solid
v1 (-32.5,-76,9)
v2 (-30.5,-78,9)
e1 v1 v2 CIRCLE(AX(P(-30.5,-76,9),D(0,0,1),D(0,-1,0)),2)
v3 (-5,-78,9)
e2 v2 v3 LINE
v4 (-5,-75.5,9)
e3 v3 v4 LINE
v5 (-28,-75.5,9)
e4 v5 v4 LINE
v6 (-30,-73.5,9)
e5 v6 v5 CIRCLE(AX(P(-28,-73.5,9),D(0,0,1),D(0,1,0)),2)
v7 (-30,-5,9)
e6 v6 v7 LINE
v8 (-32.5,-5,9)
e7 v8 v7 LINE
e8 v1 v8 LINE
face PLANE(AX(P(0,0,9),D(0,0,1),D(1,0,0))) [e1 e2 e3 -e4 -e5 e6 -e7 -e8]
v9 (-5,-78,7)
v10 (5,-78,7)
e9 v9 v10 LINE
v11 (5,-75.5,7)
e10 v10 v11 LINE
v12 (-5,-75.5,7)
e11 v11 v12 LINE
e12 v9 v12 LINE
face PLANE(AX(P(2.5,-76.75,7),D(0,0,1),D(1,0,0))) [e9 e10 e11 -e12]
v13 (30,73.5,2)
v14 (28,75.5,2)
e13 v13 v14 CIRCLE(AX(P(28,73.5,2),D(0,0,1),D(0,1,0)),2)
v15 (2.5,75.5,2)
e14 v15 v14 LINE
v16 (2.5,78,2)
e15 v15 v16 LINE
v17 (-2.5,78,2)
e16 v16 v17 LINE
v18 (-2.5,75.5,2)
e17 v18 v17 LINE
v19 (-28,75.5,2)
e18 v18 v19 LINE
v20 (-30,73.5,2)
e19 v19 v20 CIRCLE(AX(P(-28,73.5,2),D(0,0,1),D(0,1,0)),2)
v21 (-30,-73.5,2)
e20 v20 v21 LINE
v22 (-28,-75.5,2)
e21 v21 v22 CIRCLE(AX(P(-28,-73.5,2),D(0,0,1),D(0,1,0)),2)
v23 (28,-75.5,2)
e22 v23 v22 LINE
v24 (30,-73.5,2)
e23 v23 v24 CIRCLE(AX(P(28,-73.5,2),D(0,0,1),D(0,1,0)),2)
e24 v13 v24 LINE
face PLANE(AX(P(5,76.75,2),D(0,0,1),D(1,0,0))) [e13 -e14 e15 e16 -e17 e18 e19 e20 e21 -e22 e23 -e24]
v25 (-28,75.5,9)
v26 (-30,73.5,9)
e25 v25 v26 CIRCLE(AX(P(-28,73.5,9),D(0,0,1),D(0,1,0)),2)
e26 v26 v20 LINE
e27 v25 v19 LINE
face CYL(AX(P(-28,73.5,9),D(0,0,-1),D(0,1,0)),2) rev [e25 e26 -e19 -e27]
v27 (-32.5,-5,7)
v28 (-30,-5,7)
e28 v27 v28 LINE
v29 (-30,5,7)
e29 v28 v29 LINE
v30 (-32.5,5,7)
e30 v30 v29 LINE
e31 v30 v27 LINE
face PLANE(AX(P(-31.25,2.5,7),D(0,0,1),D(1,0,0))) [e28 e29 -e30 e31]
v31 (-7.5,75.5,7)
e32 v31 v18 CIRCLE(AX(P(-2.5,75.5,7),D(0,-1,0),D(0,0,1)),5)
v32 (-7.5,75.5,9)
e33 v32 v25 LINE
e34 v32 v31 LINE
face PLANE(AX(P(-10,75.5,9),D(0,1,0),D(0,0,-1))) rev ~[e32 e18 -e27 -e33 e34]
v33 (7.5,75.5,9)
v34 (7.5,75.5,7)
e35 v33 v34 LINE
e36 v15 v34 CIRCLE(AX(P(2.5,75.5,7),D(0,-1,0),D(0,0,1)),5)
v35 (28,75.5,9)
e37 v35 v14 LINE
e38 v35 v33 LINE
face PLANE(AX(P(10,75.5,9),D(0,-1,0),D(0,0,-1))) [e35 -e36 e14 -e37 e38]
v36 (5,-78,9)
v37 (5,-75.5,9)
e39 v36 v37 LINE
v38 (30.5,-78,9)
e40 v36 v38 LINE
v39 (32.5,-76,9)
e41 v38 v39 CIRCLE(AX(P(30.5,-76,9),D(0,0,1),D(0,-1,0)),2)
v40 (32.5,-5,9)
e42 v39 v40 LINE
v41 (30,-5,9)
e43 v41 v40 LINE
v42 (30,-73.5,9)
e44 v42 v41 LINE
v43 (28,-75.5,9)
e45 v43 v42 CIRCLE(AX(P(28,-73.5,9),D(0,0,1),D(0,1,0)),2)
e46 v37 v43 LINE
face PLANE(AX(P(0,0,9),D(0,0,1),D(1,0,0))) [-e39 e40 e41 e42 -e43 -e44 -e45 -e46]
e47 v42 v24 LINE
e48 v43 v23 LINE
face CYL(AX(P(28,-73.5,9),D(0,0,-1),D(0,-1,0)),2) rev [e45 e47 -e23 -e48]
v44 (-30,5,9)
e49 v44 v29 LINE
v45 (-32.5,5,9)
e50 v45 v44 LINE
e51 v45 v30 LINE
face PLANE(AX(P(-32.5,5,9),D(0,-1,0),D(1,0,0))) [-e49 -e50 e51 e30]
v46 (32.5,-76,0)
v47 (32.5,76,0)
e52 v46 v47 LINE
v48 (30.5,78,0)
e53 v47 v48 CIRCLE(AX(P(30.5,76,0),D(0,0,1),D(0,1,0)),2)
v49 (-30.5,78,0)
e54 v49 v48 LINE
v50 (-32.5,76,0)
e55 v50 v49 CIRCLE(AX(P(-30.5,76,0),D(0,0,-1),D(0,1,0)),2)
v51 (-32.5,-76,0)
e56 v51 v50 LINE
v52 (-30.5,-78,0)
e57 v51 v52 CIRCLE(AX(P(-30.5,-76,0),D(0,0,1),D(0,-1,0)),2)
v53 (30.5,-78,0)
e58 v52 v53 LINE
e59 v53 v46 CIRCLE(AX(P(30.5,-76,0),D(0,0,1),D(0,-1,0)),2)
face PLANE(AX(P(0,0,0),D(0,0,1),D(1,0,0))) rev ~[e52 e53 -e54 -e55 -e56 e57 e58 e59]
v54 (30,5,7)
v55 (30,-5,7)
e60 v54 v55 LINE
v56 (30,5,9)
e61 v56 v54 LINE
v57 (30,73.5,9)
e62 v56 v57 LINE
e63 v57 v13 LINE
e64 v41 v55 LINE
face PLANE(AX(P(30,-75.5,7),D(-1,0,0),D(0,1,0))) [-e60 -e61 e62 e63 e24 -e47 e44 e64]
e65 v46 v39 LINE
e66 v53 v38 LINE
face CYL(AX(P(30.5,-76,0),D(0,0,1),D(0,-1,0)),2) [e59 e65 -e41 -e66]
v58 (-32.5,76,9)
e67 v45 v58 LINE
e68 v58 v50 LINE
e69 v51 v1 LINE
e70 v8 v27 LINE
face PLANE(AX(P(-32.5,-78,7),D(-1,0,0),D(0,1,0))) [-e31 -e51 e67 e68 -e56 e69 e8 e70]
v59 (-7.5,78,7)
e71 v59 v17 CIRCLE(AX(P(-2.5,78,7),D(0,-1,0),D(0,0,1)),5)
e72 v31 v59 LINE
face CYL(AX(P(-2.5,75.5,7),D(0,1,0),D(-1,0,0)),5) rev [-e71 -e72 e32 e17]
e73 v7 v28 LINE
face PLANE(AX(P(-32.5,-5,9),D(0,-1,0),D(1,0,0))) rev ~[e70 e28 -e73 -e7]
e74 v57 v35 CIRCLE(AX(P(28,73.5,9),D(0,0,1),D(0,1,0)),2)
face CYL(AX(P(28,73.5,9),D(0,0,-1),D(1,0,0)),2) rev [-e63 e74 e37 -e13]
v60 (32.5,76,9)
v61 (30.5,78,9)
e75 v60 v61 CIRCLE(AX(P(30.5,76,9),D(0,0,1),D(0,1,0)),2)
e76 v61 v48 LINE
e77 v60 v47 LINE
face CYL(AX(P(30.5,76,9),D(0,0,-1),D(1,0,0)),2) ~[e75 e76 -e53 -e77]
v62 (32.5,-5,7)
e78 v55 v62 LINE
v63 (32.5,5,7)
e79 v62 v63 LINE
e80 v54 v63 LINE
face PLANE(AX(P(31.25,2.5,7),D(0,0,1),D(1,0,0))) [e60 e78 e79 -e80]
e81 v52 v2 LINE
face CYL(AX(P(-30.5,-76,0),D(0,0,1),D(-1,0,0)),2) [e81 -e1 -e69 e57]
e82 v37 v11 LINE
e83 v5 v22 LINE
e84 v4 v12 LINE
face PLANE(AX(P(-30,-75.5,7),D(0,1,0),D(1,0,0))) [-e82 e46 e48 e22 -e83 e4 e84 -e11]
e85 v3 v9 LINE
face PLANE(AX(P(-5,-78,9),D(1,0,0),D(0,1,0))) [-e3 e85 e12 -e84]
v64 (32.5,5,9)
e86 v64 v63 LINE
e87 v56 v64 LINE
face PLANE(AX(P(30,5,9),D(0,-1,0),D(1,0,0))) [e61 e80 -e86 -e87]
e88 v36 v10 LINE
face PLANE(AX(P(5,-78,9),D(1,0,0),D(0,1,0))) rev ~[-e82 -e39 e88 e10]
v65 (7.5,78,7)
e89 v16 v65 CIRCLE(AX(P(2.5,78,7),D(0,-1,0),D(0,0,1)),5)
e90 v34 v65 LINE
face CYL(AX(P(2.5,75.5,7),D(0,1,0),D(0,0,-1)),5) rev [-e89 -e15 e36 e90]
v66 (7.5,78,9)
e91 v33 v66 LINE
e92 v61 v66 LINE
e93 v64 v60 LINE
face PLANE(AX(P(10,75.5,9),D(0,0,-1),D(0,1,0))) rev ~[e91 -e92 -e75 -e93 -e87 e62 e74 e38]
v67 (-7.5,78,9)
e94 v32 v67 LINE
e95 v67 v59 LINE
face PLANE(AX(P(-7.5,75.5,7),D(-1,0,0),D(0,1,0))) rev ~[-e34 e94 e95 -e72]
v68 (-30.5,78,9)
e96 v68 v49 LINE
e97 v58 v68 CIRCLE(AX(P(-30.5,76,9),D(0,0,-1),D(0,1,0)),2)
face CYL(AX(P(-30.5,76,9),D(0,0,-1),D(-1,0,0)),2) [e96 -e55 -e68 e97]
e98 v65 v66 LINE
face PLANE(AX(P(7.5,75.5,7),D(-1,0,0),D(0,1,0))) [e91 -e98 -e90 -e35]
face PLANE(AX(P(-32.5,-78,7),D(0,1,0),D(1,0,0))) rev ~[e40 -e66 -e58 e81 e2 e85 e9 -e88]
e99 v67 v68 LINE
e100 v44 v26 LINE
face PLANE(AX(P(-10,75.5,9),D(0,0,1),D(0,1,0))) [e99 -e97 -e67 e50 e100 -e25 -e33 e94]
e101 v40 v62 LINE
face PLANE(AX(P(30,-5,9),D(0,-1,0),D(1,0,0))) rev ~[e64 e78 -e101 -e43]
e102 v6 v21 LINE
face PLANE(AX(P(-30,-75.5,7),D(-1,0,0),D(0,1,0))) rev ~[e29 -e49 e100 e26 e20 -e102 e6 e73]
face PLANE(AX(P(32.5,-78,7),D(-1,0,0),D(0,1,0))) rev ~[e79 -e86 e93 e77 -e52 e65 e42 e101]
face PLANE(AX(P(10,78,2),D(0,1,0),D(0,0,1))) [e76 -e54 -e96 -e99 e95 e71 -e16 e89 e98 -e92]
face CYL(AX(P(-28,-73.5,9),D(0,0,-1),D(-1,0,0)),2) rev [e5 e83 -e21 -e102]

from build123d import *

# Parameters (mm, degrees)
F0_W      = 65
F0_H      = 156
F0_W_2    = 60
F0_H_2    = 151
F1_DEPTH  = 2
F2_DEPTH  = 7
F3_W      = 10
F3_H      = 2.5
F4_DEPTH  = 5
F5_DEPTH  = 2
F6_R      = 2
F7_R      = 2
F8_W      = 5
F8_H      = 2.5
F8_W_2    = 2.5
F8_H_2    = 5
F9_DEPTH  = 2
F10_DEPTH = 2.5
F11_DEPTH = 2.5
F12_R     = 5


with BuildPart() as f1:
    # F0 (on Top) → F1 (new body)
    with BuildSketch(Plane.XY):
        Rectangle(F0_W, F0_H)
        Rectangle(F0_W_2, F0_H_2, mode=Mode.SUBTRACT)
        Rectangle(F0_W_2, F0_H_2)
    extrude(amount=F1_DEPTH)

    # F0 (on Top) → F2 (join)
    with BuildSketch(Plane.XY):
        Rectangle(F0_W, F0_H)
        Rectangle(F0_W_2, F0_H_2, mode=Mode.SUBTRACT)
    extrude(amount=F2_DEPTH)

    # F3 (on face) → F4 (cut, through all)
    with BuildSketch(Plane.XY.offset(7)):
        with Locations((5, 76.75)):
            Rectangle(F3_W, F3_H)
        with Locations((-5, 76.75)):
            Rectangle(F3_W, F3_H)
    extrude(amount=-F4_DEPTH, mode=Mode.SUBTRACT)

    # F5 (add): a face of the model
    f5_faces = [f1.faces().sort_by_distance(p)[0] for p in [
        (0, -76.31, 7),
    ]]
    extrude(f5_faces, amount=F5_DEPTH)

    # F6
    f6_edges = [f1.edges().sort_by_distance(p)[0] for p in [
        (-32.5, 78, 4.5),
        (32.5, 78, 4.5),
        (32.5, -78, 4.5),
        (-32.5, -78, 4.5),
    ]]
    fillet(f6_edges, radius=F6_R)

    # F7
    f7_edges = [f1.edges().sort_by_distance(p)[0] for p in [
        (-30, 75.5, 5.5),
        (30, 75.5, 5.5),
        (30, -75.5, 5.5),
        (-30, -75.5, 5.5),
    ]]
    fillet(f7_edges, radius=F7_R)

    # F8 (on face) → F9 (cut)
    with BuildSketch(Plane.XY.offset(9)):
        with Locations((2.5, -76.75)):
            Rectangle(F8_W, F8_H)
        with Locations((-2.5, -76.75)):
            Rectangle(F8_W, F8_H)
        with Locations((-31.25, 2.5)):
            Rectangle(F8_W_2, F8_H_2)
        with Locations((-31.25, -2.5)):
            Rectangle(F8_W_2, F8_H_2)
        with Locations((31.25, 2.5)):
            Rectangle(F8_W_2, F8_H_2)
        with Locations((31.25, -2.5)):
            Rectangle(F8_W_2, F8_H_2)
    extrude(amount=-F9_DEPTH, mode=Mode.SUBTRACT)

    # F10 (add): a face of the model
    f10_faces = [f1.faces().sort_by_distance(p)[0] for p in [
        (-10, 76.75, 5.5),
    ]]
    extrude(f10_faces, amount=F10_DEPTH)

    # F11 (add): a face of the model
    f11_faces = [f1.faces().sort_by_distance(p)[0] for p in [
        (10, 76.75, 5.5),
    ]]
    extrude(f11_faces, amount=F11_DEPTH)

    # F12
    f12_edges = [f1.edges().sort_by_distance(p)[0] for p in [
        (7.5, 76.75, 2),
        (-7.5, 76.75, 2),
    ]]
    fillet(f12_edges, radius=F12_R)


solid = f1.part
